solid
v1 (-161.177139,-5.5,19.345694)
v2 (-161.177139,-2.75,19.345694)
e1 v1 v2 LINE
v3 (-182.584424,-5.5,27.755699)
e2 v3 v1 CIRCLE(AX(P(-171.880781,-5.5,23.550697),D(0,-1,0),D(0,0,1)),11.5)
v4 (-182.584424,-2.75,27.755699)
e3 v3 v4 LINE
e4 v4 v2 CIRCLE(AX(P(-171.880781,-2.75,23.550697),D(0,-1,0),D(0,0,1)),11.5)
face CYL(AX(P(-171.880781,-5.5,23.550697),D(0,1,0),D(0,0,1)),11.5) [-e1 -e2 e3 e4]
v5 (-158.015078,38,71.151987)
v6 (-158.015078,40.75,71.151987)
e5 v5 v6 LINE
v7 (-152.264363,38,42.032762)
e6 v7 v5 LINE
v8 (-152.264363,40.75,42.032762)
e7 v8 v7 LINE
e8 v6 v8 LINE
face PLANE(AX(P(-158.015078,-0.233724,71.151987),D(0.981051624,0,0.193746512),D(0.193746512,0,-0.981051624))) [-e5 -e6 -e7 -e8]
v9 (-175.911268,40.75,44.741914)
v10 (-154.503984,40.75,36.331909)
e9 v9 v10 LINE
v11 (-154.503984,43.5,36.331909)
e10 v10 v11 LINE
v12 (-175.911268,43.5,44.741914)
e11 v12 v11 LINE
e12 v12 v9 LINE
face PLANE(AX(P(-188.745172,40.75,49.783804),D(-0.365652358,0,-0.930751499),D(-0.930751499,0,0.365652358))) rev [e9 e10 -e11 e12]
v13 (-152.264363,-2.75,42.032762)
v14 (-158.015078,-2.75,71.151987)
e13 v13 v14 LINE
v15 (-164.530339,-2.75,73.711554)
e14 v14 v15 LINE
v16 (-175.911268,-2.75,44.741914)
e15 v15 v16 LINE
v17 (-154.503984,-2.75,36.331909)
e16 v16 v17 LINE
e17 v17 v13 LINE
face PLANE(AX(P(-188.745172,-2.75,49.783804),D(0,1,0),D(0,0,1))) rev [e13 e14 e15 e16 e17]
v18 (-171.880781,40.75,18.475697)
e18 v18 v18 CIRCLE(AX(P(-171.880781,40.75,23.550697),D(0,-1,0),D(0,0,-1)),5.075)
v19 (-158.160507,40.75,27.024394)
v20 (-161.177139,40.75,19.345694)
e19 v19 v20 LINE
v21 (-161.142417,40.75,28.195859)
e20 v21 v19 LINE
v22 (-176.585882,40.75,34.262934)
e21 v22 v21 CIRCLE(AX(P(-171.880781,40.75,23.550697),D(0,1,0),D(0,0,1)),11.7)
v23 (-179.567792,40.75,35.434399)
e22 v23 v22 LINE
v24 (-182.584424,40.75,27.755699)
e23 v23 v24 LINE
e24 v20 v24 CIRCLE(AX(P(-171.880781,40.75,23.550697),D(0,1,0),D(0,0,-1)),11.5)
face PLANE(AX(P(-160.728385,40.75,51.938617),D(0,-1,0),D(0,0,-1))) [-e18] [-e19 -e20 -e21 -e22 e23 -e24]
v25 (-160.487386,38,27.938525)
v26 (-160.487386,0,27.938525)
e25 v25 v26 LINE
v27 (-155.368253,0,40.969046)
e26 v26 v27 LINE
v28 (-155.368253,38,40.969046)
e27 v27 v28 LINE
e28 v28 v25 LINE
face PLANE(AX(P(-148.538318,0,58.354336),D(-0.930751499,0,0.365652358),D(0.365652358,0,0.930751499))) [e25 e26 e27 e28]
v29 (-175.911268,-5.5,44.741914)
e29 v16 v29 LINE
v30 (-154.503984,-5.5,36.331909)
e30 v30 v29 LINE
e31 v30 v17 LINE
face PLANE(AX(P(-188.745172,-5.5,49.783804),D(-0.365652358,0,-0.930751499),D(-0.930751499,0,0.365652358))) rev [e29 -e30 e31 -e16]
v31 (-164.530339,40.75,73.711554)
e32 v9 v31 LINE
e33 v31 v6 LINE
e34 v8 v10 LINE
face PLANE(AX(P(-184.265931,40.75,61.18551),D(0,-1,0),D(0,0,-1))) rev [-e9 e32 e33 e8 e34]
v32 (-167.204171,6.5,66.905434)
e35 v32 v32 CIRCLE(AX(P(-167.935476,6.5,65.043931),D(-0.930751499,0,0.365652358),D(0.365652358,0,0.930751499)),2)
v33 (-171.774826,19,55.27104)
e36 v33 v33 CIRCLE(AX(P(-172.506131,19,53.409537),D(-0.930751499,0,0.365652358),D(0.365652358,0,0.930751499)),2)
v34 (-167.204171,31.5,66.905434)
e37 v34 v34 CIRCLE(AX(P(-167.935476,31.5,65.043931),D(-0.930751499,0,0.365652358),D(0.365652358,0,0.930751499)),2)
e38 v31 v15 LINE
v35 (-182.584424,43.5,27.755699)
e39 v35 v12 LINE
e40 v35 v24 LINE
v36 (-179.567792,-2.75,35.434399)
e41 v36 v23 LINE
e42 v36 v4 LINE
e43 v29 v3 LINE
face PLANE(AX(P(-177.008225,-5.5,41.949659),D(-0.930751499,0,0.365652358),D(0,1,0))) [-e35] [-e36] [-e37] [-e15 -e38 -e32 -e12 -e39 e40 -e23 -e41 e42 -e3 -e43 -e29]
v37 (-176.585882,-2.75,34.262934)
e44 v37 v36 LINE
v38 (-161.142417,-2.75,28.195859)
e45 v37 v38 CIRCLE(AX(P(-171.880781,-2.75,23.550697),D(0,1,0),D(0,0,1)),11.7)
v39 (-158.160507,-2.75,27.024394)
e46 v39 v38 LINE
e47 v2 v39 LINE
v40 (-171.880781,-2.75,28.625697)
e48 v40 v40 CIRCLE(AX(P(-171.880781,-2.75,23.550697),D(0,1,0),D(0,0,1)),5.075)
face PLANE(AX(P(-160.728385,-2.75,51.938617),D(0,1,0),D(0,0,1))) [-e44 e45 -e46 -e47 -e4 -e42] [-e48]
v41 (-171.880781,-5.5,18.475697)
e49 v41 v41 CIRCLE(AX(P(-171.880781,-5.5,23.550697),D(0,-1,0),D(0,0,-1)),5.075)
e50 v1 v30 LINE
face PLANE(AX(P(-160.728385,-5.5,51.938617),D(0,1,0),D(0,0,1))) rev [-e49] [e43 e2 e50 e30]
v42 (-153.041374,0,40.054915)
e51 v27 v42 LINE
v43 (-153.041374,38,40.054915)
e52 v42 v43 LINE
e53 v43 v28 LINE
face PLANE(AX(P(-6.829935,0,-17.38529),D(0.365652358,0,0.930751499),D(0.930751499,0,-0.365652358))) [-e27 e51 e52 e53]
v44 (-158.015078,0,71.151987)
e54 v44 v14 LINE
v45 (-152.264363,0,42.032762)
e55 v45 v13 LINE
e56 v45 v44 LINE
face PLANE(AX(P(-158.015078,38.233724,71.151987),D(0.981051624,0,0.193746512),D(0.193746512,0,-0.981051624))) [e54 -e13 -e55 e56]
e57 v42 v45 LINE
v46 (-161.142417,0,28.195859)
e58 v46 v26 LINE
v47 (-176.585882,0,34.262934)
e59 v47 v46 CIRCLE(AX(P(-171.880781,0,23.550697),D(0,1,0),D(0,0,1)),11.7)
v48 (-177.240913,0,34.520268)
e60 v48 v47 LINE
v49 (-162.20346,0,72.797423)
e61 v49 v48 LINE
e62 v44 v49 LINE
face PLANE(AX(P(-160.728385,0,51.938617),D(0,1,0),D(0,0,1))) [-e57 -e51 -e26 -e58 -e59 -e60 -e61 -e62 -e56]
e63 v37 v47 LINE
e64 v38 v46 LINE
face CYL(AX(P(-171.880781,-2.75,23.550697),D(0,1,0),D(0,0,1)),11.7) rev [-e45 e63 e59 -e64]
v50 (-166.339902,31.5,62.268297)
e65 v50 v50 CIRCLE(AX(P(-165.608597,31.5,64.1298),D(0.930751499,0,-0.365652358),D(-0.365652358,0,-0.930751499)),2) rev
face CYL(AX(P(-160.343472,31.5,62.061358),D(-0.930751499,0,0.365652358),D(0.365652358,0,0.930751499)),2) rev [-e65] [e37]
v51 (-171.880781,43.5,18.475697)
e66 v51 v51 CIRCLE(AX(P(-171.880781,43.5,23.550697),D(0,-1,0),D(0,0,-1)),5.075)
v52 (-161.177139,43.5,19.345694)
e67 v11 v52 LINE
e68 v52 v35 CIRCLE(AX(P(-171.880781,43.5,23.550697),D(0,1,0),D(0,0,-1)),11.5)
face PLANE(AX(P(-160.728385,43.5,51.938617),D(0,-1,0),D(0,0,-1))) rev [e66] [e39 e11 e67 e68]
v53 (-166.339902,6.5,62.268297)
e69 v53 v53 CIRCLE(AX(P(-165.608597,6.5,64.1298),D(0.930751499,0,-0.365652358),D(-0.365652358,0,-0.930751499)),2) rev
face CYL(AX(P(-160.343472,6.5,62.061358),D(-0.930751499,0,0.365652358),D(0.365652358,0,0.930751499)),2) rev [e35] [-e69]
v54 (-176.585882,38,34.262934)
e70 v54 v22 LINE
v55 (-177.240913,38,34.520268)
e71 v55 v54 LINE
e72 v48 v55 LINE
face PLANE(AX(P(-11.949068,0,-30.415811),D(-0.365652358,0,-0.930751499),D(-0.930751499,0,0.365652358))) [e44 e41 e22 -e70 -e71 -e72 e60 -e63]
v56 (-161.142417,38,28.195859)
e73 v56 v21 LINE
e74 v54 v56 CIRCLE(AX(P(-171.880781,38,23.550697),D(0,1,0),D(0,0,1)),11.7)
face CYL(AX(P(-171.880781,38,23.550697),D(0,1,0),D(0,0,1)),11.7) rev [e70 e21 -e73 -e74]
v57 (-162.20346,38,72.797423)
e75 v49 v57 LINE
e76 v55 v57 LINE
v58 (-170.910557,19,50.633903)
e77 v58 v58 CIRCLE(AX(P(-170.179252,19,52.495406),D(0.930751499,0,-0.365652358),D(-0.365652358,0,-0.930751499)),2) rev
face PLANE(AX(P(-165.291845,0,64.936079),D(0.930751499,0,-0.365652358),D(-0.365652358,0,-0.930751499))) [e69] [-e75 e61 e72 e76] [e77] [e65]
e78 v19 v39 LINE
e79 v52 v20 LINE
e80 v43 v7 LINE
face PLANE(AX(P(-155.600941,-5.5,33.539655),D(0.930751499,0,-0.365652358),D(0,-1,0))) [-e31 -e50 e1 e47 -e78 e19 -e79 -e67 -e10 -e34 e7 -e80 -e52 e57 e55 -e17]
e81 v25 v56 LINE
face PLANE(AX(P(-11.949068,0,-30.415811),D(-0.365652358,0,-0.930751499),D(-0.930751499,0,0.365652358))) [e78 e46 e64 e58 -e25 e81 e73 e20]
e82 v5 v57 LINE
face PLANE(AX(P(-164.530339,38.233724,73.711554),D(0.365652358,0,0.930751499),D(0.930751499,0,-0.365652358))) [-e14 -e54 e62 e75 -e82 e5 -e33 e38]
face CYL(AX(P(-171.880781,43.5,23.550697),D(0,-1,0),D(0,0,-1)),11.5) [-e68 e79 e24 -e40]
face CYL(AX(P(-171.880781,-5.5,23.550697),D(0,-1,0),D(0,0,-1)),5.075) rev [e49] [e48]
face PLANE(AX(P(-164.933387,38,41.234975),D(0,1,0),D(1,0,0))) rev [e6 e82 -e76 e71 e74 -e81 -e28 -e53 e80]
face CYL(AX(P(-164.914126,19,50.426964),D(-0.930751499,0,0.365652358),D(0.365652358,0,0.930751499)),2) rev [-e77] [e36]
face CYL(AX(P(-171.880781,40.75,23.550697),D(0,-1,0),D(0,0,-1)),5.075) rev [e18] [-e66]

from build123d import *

# Parameters (mm, degrees)
SALIENTE_EXTRUIR1_START   = -2.75
SALIENTE_EXTRUIR1_DEPTH   = 5.5
SALIENTE_EXTRUIR1_2_DEPTH = 2.75
SALIENTE_EXTRUIR2_DEPTH   = 38
SALIENTE_EXTRUIR3_START   = 2.75
SALIENTE_EXTRUIR3_DEPTH   = 2.75
CROQUIS4_W                = 23
CROQUIS4_H                = 43.5
CORTAR_EXTRUIR1_DEPTH     = 8.25
CORTAR_EXTRUIR2_DEPTH     = 2.75
CROQUIS6_W                = 38
CROQUIS6_H                = 22.249999999
CORTAR_EXTRUIR3_DEPTH     = 16.59246817
CROQUIS7_W                = 3.203765914
CROQUIS7_H                = 38
CORTAR_EXTRUIR4_DEPTH     = 8.25
CROQUIS8_W                = 3.203765916
CROQUIS8_H                = 38
CORTAR_EXTRUIR5_DEPTH     = 8.25
CROQUIS9_W                = 14
CROQUIS9_H                = 38
CORTAR_EXTRUIR6_DEPTH     = 0.703765915
CROQUIS10_W               = 14
CROQUIS10_H               = 38
CORTAR_EXTRUIR7_DEPTH     = 0.703765915
SALIENTE_EXTRUIR4_START   = 2.75
SALIENTE_EXTRUIR4_DEPTH   = 2.75
CORTAR_EXTRUIR8_DEPTH     = 2.75
CROQUIS13_W               = 12.249999999
CROQUIS13_H               = 2.75
CORTAR_EXTRUIR9_DEPTH     = 74.034358614
CROQUIS14_W               = 12.249999999
CROQUIS14_H               = 2.75
CORTAR_EXTRUIR10_DEPTH    = 74.034358614
CROQUIS15_W               = 5
CROQUIS15_H               = 2.75
CROQUIS16_W               = 5
CROQUIS16_H               = 2.75
TALADRO1_D                = 10.15
TALADRO1_DEPTH            = 2.75
TALADRO2_D                = 10.15
CORTAR_EXTRUIR11_REACH    = 202.135
SALIENTE_EXTRUIR5_DEPTH   = 2.75
SALIENTE_EXTRUIR6_START   = -2.75
SALIENTE_EXTRUIR6_DEPTH   = 2.75
CROQUIS24_W               = 27.125
CROQUIS24_H               = 38
SALIENTE_EXTRUIR7_DEPTH   = 2.5
CROQUIS25_R               = 2
CORTAR_EXTRUIR12_DEPTH    = 2.5


with BuildPart() as part:
    # Saliente-Extruir1: read off the stored shape, not the designer's step
    # Saliente-Extruir1 outline → Saliente-Extruir1 (new body)
    with BuildSketch(Plane(origin=(0, 40.75, 0), x_dir=(-1, 0, 0), z_dir=(0, 1, 0)).offset(SALIENTE_EXTRUIR1_START)):
        with BuildLine():
            Line((161.177139208, 19.345694485), (182.584423689, 27.755698719))
            Line((182.584423689, 27.755698719), (171.432026769, 56.143619441))
            ThreePointArc((171.432026769, 56.143619441), (156.523382412, 62.642259564), (150.024742289, 47.733615207))
            Line((150.024742289, 47.733615207), (161.177139208, 19.345694485))
        make_face()
    extrude(amount=SALIENTE_EXTRUIR1_DEPTH)

    # Saliente-Extruir1 2 outline → Saliente-Extruir1 2 (add)
    with BuildSketch(Plane(origin=(0, 40.75, 0), x_dir=(-1, 0, 0), z_dir=(0, 1, 0))):
        with BuildLine():
            ThreePointArc((161.177139208, 19.345694485), (176.085783565, 12.847054362), (182.584423687, 27.755698719))
            Line((182.584423687, 27.755698719), (161.177139208, 19.345694485))
        make_face()
    extrude(amount=SALIENTE_EXTRUIR1_2_DEPTH)

    # Croquis2 → Saliente-Extruir2 (add)
    with BuildSketch(Plane.XZ.offset(-38)):
        Polygon((-171.432026768, 56.143619442), (-150.024742288, 47.733615205), (-161.177139209, 19.345694483), (-182.584423689, 27.755698719), align=None)
    extrude(amount=SALIENTE_EXTRUIR2_DEPTH)

    # Croquis3 → Saliente-Extruir3 (add)
    with BuildSketch(Plane.XZ.offset(SALIENTE_EXTRUIR3_START)):
        with BuildLine():
            Line((-182.584423688, 27.755698719), (-171.432026768, 56.143619441))
            ThreePointArc((-171.432026768, 56.143619441), (-156.523382412, 62.642259564), (-150.024742289, 47.733615207))
            Line((-150.024742289, 47.733615207), (-161.177139208, 19.345694485))
            Line((-161.177139208, 19.345694485), (-182.584423688, 27.755698719))
        make_face()
    extrude(amount=-SALIENTE_EXTRUIR3_DEPTH)

    # Croquis4 → Cortar-Extruir1 (cut)
    with BuildSketch(Plane(origin=(-14.965700114, 0, -38.094511116), x_dir=(-0.9307514991056489, 0, 0.3656523580022251), z_dir=(-0.3656523580022251, 0, -0.9307514991056489))):
        with Locations((168.589662745, 19)):
            Rectangle(CROQUIS4_W, CROQUIS4_H)
    extrude(amount=-CORTAR_EXTRUIR1_DEPTH, mode=Mode.SUBTRACT)

    # Croquis5 → Cortar-Extruir2 (cut)
    with BuildSketch(Plane(origin=(0, 40.75, 0), x_dir=(1, 0, 0), z_dir=(0, 1, 0))):
        with BuildLine():
            Line((-161.142417183, -28.195858914), (-176.585881806, -34.262934025))
            ThreePointArc((-176.585881806, -34.262934025), (-167.602648859, -34.440489141), (-161.142417183, -28.195858914))
        make_face()
    extrude(amount=-CORTAR_EXTRUIR2_DEPTH, mode=Mode.SUBTRACT)

    # Croquis6 → Cortar-Extruir3 (cut)
    with BuildSketch(Plane(origin=(-149.193349022, 0, 58.611670162), x_dir=(0, 1, 0), z_dir=(0.9307514991056486, 0, -0.3656523580022258))):
        with Locations((19, -21.553766865)):
            Rectangle(CROQUIS6_W, CROQUIS6_H)
    extrude(amount=-CORTAR_EXTRUIR3_DEPTH, mode=Mode.SUBTRACT)

    # Croquis7 → Cortar-Extruir4 (cut)
    with BuildSketch(Plane(origin=(-3.8133032, 0, -9.706590403), x_dir=(0.9307514990825102, 0, -0.36565235806112356), z_dir=(0.36565235806112356, 0, 0.9307514990825102))):
        with Locations((-158.691545702, 19)):
            Rectangle(CROQUIS7_W, CROQUIS7_H)
    extrude(amount=-CORTAR_EXTRUIR4_DEPTH, mode=Mode.SUBTRACT)

    # Croquis8 → Cortar-Extruir5 (cut)
    with BuildSketch(Plane(origin=(-3.8133032, 0, -9.706590403), x_dir=(0.9307514990825102, 0, -0.36565235806112356), z_dir=(0.36565235806112356, 0, 0.9307514990825102))):
        with Locations((-178.487779787, 19)):
            Rectangle(CROQUIS8_W, CROQUIS8_H)
    extrude(amount=-CORTAR_EXTRUIR5_DEPTH, mode=Mode.SUBTRACT)

    # Croquis9 → Cortar-Extruir6 (cut)
    with BuildSketch(Plane(origin=(-164.636813645, 0, 64.678745273), x_dir=(-0.3656523580022247, 0, -0.930751499105649), z_dir=(0.930751499105649, 1.4355340193330324e-15, -0.3656523580022247))):
        with Locations((25.678766864, 19)):
            Rectangle(CROQUIS9_W, CROQUIS9_H)
    extrude(amount=-CORTAR_EXTRUIR6_DEPTH, mode=Mode.SUBTRACT)

    # Croquis10 → Cortar-Extruir7 (cut)
    with BuildSketch(Plane(origin=(-149.193349022, 0, 58.611670162), x_dir=(0.3656523580022248, 0, 0.930751499105649), z_dir=(-0.930751499105649, -1.4355340193330322e-15, 0.3656523580022248))):
        with Locations((-25.678766864, 19)):
            Rectangle(CROQUIS10_W, CROQUIS10_H)
    extrude(amount=-CORTAR_EXTRUIR7_DEPTH, mode=Mode.SUBTRACT)

    # Croquis11 → Saliente-Extruir4 (add)
    with BuildSketch(Plane.XZ.offset(2.75).offset(SALIENTE_EXTRUIR4_START)):
        with BuildLine():
            Line((-150.024742289, 47.733615207), (-161.177139208, 19.345694485))
            ThreePointArc((-161.177139208, 19.345694485), (-176.085783565, 12.847054362), (-182.584423687, 27.755698719))
            Line((-182.584423687, 27.755698719), (-171.432026769, 56.143619441))
            ThreePointArc((-171.432026769, 56.143619441), (-156.523382412, 62.642259564), (-150.024742289, 47.733615207))
        make_face()
    extrude(amount=-SALIENTE_EXTRUIR4_DEPTH)

    # Croquis12 → Cortar-Extruir8 (cut)
    with BuildSketch(Plane(origin=(0, 0, 0), x_dir=(-1, 0, 0), z_dir=(0, 1, 0))):
        with BuildLine():
            Line((161.142417183, 28.195858914), (176.585881806, 34.262934025))
            ThreePointArc((176.585881806, 34.262934025), (167.602648859, 34.440489141), (161.142417183, 28.195858914))
        make_face()
    extrude(amount=-CORTAR_EXTRUIR8_DEPTH, mode=Mode.SUBTRACT)

    # Croquis13 → Cortar-Extruir9 (cut, through all)
    with BuildSketch(Plane(origin=(-146.211439094, 0, 57.440205601), x_dir=(-0.36565235800222584, 0, -0.9307514991056486), z_dir=(0.9307514991056486, 0, -0.36565235800222584))):
        with Locations((16.553766864, -4.125)):
            Rectangle(CROQUIS13_W, CROQUIS13_H)
    extrude(amount=-CORTAR_EXTRUIR9_DEPTH, mode=Mode.SUBTRACT)

    # Croquis14 → Cortar-Extruir10 (cut, through all)
    with BuildSketch(Plane(origin=(-146.211439094, 0, 57.440205601), x_dir=(-0.36565235800222584, 0, -0.9307514991056486), z_dir=(0.9307514991056486, 0, -0.36565235800222584))):
        with Locations((16.553766864, 42.125)):
            Rectangle(CROQUIS14_W, CROQUIS14_H)
    extrude(amount=-CORTAR_EXTRUIR10_DEPTH, mode=Mode.SUBTRACT)

    # Croquis15 → Revolución1 (revolve)
    with BuildSketch(Plane(origin=(0, 0, 51.938617325), x_dir=(-1, 0, 0), z_dir=(0, 0, -1))):
        with Locations((158.228384529, -4.125)):
            Rectangle(CROQUIS15_W, CROQUIS15_H)
    revolve(axis=Axis((-160.728384529, -5.5, 51.938617325), (0, 1, 0)))

    # Croquis16 → Revolución2 (revolve)
    with BuildSketch(Plane(origin=(0, 0, 51.938617325), x_dir=(-1, 0, 0), z_dir=(0, 0, -1))):
        with Locations((158.228384529, 42.125)):
            Rectangle(CROQUIS16_W, CROQUIS16_H)
    revolve(axis=Axis((-160.728384529, 40.75, 51.938617325), (0, 1, 0)))

    # Taladro1
    with Locations(Plane(origin=(0, -5.5, 0), x_dir=(-1, 0, 0), z_dir=(0, -1, 0))):
        with Locations((171.880781448, -23.550696602)):
            Hole(TALADRO1_D / 2, depth=TALADRO1_DEPTH)

    # Taladro2 (through all)
    with Locations(Plane(origin=(0, 40.75, 0), x_dir=(-1, 0, 0), z_dir=(0, -1, 0))):
        with Locations((171.880781448, -23.550696602)):
            Hole(TALADRO2_D / 2)

    # Cortar-Extruir11: up to this face of the body (flat: up to its plane)
    cortar_extruir11_end = Plane(part.part.faces().sort_by_distance((-169.996704911, 43.5, 28.346528005))[0])
    # Croquis21 → Cortar-Extruir11 (cut, up to the picked face)
    with BuildSketch(Plane.XZ.offset(5.5), mode=Mode.PRIVATE) as cortar_extruir11_sk1:
        Polygon((-173.671647461, 50.44276651), (-152.264362982, 42.032762276), (-144.951315822, 60.647792258), (-166.358600301, 69.057796492), align=None)
    cortar_extruir11_tool1 = split(extrude(cortar_extruir11_sk1.sketch, amount=-CORTAR_EXTRUIR11_REACH, mode=Mode.PRIVATE), bisect_by=cortar_extruir11_end, keep=Keep.BOTH, mode=Mode.PRIVATE)
    add(cortar_extruir11_tool1.solids().sort_by(Axis((-159.311482, -5.5, 55.545279), (0, 1, 0)))[0], mode=Mode.SUBTRACT)

    # Croquis22 → Saliente-Extruir5 (add)
    with BuildSketch(Plane.XZ.offset(2.75)):
        Polygon((-152.264362982, 42.032762276), (-173.671647461, 50.44276651), (-164.530338511, 73.711553987), (-158.015078017, 71.151987481), align=None)
    extrude(amount=-SALIENTE_EXTRUIR5_DEPTH)

    # Croquis23 → Saliente-Extruir6 (add)
    with BuildSketch(Plane(origin=(0, 40.75, 0), x_dir=(1, 0, 0), z_dir=(0, 1, 0)).offset(SALIENTE_EXTRUIR6_START)):
        Polygon((-158.015078017, -71.151987481), (-152.264362982, -42.032762276), (-173.671647461, -50.44276651), (-164.530338511, -73.711553987), align=None)
    extrude(amount=SALIENTE_EXTRUIR6_DEPTH)

    # Croquis24 → Saliente-Extruir7 (add)
    with BuildSketch(Plane(origin=(-167.618723573, 0, 65.850209835), x_dir=(0.36565235800222584, 0, 0.9307514991056486), z_dir=(-0.9307514991056486, 0, 0.36565235800222584))):
        with Locations((-5.116266864, 19)):
            Rectangle(CROQUIS24_W, CROQUIS24_H)
    extrude(amount=-SALIENTE_EXTRUIR7_DEPTH)

    # Croquis25 → Cortar-Extruir12 (cut)
    with BuildSketch(Plane(origin=(-167.618723573, 0, 65.850209835), x_dir=(0.36565235800222584, 0, 0.9307514991056486), z_dir=(-0.9307514991056486, 0, 0.36565235800222584))):
        with Locations((-0.866266864, 6.5)):
            Circle(CROQUIS25_R)
        with Locations((-0.866266864, 31.5)):
            Circle(CROQUIS25_R)
        with Locations((-13.366266864, 19)):
            Circle(CROQUIS25_R)
    extrude(amount=-CORTAR_EXTRUIR12_DEPTH, mode=Mode.SUBTRACT)


solid = part.part
